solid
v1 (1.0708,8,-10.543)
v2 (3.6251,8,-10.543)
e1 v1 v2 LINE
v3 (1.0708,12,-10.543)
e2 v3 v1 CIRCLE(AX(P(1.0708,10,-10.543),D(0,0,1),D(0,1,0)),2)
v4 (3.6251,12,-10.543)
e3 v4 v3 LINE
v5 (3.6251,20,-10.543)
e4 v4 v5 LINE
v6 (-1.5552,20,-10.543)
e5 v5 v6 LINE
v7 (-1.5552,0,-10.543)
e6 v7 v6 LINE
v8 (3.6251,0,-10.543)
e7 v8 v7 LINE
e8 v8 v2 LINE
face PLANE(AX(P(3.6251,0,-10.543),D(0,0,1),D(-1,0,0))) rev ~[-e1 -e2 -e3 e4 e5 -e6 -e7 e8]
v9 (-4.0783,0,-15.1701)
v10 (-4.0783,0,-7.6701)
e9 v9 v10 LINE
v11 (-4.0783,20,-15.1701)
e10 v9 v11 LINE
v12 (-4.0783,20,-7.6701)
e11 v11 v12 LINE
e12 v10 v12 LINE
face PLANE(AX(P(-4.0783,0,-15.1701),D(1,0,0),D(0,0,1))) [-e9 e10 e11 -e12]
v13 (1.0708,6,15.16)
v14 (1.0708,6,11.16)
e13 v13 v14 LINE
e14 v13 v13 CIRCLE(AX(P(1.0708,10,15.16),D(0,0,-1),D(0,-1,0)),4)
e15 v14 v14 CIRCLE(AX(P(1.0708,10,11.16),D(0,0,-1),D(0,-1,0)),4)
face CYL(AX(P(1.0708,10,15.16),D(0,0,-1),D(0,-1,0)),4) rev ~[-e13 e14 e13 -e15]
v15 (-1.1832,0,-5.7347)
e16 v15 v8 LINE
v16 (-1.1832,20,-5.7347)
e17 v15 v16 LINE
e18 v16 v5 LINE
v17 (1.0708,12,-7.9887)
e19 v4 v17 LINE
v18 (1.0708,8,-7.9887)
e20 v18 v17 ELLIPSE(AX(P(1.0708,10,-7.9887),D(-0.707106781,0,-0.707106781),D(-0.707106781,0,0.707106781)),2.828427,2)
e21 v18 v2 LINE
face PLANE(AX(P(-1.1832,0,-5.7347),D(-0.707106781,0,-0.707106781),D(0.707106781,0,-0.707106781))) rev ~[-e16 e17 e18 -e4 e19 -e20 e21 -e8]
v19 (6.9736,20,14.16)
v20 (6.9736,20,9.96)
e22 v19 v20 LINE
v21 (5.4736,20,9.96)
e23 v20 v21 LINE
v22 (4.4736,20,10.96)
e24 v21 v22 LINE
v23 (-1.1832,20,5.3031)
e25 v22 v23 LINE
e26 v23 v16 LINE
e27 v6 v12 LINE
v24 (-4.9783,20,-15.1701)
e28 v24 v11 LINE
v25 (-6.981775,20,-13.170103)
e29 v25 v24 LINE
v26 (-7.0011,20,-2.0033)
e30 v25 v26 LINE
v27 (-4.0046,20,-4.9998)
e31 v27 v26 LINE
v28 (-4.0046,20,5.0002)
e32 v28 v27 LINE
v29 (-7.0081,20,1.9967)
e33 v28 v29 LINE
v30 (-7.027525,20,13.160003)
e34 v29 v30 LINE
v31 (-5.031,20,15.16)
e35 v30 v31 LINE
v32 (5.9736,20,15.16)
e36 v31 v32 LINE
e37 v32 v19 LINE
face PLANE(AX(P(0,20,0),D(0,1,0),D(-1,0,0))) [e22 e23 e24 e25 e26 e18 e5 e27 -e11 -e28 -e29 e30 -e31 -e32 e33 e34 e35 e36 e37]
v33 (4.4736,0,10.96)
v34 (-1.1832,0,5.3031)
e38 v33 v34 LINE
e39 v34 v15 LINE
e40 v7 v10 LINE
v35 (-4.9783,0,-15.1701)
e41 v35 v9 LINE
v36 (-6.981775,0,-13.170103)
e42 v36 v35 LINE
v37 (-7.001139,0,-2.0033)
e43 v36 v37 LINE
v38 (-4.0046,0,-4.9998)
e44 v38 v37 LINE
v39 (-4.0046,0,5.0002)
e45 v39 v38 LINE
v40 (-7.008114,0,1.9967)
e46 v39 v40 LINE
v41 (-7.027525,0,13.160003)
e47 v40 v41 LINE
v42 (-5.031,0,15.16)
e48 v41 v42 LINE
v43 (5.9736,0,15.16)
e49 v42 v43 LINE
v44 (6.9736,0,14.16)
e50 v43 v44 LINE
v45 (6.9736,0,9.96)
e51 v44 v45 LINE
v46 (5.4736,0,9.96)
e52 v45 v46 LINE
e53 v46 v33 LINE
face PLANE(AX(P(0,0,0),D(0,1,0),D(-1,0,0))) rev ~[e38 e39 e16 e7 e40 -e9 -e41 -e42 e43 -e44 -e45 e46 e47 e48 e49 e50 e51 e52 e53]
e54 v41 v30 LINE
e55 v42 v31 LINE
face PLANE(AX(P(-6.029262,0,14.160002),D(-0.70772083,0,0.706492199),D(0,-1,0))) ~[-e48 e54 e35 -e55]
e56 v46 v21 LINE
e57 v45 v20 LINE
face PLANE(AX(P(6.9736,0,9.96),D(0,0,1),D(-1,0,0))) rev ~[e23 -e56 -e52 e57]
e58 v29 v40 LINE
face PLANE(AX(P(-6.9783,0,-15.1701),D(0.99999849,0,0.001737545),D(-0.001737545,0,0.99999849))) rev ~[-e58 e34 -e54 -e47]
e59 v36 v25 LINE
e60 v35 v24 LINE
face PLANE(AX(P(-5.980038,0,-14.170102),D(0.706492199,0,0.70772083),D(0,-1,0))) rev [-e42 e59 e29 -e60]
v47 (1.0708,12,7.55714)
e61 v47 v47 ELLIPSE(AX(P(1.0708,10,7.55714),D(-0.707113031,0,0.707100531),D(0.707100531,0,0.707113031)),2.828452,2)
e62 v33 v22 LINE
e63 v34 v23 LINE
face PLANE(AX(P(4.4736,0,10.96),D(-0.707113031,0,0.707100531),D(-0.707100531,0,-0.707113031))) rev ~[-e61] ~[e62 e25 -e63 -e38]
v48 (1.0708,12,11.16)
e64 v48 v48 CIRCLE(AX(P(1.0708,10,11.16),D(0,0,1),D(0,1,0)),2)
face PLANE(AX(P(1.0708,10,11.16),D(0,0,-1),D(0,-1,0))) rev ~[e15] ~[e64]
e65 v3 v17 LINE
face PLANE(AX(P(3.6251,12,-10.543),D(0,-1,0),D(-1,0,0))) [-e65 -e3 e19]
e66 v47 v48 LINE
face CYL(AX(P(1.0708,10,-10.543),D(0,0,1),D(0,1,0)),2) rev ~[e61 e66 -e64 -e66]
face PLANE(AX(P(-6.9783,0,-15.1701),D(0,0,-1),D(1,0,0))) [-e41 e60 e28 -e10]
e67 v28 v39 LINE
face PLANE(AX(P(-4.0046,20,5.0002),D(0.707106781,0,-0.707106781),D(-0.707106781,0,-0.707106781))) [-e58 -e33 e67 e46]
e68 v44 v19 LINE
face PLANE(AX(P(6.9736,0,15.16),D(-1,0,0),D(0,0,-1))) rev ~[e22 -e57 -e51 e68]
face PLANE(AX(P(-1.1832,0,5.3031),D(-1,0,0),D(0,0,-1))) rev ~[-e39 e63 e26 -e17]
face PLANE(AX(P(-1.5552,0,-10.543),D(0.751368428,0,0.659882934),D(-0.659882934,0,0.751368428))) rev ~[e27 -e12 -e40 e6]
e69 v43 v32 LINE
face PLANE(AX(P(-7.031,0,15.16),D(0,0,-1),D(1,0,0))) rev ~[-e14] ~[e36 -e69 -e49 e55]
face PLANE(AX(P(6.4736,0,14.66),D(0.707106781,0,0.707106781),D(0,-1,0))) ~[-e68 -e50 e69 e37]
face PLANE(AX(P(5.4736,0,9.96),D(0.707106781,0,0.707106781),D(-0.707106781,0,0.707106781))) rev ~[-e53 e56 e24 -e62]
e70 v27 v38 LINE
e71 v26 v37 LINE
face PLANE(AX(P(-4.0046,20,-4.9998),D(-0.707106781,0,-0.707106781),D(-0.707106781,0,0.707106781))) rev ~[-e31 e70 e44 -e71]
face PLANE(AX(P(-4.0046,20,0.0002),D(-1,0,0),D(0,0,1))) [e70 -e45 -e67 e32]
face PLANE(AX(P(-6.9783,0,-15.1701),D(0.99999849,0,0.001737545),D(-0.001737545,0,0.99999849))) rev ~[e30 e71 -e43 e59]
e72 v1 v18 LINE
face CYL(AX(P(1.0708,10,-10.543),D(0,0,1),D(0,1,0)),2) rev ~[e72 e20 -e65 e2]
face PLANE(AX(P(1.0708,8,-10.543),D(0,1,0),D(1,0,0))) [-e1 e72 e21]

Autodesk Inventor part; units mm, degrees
ref_plane "YZ Plane" through (0, 0, 0) normal (1, 0, 0) x (0, 1, 0)
ref_plane "XZ Plane" through (0, 0, 0) normal (0, 1, 0) x (-1, 0, 0)
ref_plane "XY Plane" through (0, 0, 0) normal (0, 0, 1) x (1, 0, 0)
sketch "Sketch1" plane through (0, 0, 0) normal (0, 1, 0) x (-1, 0, 0)
  line L0 (7.031, 15.16) -> (-6.9736, 15.16)
  line L1 (6.9783, -15.1701) -> (7.031, 15.16)
  line L2 (7.031, 15.16) -> (-7.0217, -15.14) construction
  line L3 (-6.9736, 15.16) -> (6.9783, -15.1701) construction
  line L4 (-5.5, 10.15) -> (-3.5, 10.15) construction
  line L5 (6.9783, -15.1701) -> (4.0783, -15.1701)
  line L6 (4.0783, -15.1701) -> (4.0783, -7.6701)
  line L7 (-5.5, 10.15) -> (-4, 10.15) construction
  line L8 (1.5552, -10.543) -> (4.0783, -7.6701)
  line L9 (-6.9736, 15.16) -> (-6.9736, 9.96)
  line L10 (-6.9736, 9.96) -> (-5.4736, 9.96)
  line L11 (-5.4736, 9.96) -> (-4.4736, 10.96)
  line L12 (-5.4736, 9.96) -> (-4.0594, 9.96) construction
  line L13 (-4.4736, 10.96) -> (1.1832, 5.3031)
  line L14 (1.1832, 5.3031) -> (1.1832, -5.7347)
  line L15 (1.1832, -5.7347) -> (9.1832, -5.7347) construction
  line L16 (1.1832, -5.7347) -> (-3.6251, -10.543)
  line L17 (-3.6251, -10.543) -> (1.5552, -10.543)
  point P0 (0, 0)
  point P1 (-6.5, 10.15)
  dimension "d0" = 14
  dimension "d1" = 30.3
  dimension "d11" = 2.9
  dimension "d12" = 7.5
  dimension "d25" = 41.29
  dimension "d28" = 5.2
  dimension "d29" = 1.5
  dimension "d32" = 4.2
  dimension "d33" = 8
  dimension "d38" = 6.8
  dimension "d40" = 135
  dimension "d41" = 90
  dimension "d42" = 135
extrude "Extrusion1" add sketch "Sketch1" along normal blind 20
chamfer "Chamfer1" distance 2 angle 45 2 edges at (-7.031, 10, 15.16) (-6.9783, 10, -15.1701)
chamfer "Chamfer2" distance 1 angle 45 1 edges at (6.9736, 10, 15.16)
sketch "Sketch3" plane through (3.6251, 0, -10.543) normal (0, 0, -1) x (-1, 0, 0)
  line L0 (0, 0) -> (5.1803, 0) construction
  line L1 (5.1803, 0) -> (5.1803, 20) construction
  line L2 (0, 20) -> (5.1803, 20) construction
  line L3 (0, 0) -> (0, 20) construction
  line L4 (8.6561, 20) -> (-2.3485, 20) construction
  line L5 (5.1803, 0) -> (5.1803, 20) construction
  line L6 (5.1803, 10) -> (2.5543, 10) construction
  point P0 (3.6251, 0)
  dimension "d45" = 2.626
hole "Hole1" at (1.0708, 10, -10.543) direction (0, 0, 1) diameter 4 end through all
sketch "Sketch4" plane through (3.6251, 0, -10.543) normal (0, 0, -1) x (-1, 0, 0)
  circle A0 centre (2.5543, 10) radius 2 construction
  line L0 (2.5543, 8) -> (2.5543, 12)
  circle A1 centre (2.5543, 10) radius 2 construction
  line L1 (2.5543, 8) -> (0, 8)
  line L2 (0, 0) -> (0, 20) projected
  line L3 (0, 8) -> (0, 12)
  line L4 (0, 12) -> (2.5543, 12)
  point P0 (3.6251, 0)
extrude "Extrusion2" cut sketch "Sketch4" against normal blind 5
sketch "Sketch5" plane through (-5.031, 0, 15.16) normal (0, 0, 1) x (1, 0, 0)
  circle A0 centre (6.1018, 10) radius 2 projected
  point P0 (5.031, 0)
hole "Hole2" at (1.0708, 10, 15.16) direction (0, 0, -1) diameter 8 depth 4
sketch "Sketch6" plane through (0, 20, 0) normal (0, 1, 0) x (1, 0, 0)
  line L0 (6.9736, -14.16) -> (5.9736, -15.16) construction
  line L1 (6.9736, -14.16) -> (6.9736, -9.96) construction
  line L2 (6.9736, -9.96) -> (5.4736, -9.96) construction
  line L3 (5.4736, -9.96) -> (4.4736, -10.96) construction
  line L4 (4.4736, -10.96) -> (-1.1832, -5.3031) construction
  line L5 (-1.1832, -5.3031) -> (-1.1832, 5.7347) construction
  line L6 (-1.1832, 5.7347) -> (3.6251, 10.543) construction
  line L7 (3.6251, 10.543) -> (-1.5552, 10.543) construction
  line L8 (-1.5552, 10.543) -> (-4.0783, 7.6701) construction
  line L9 (-4.0783, 7.6701) -> (-4.0783, 15.1701) construction
  line L10 (-4.0783, 15.1701) -> (-4.9783, 15.1701) construction
  line L11 (-6.9817, 13.1701) -> (-4.9783, 15.1701) construction
  line L12 (-6.9817, 13.1701) -> (-7.0275, -13.16) construction
  line L13 (-5.031, -15.16) -> (-7.0275, -13.16) construction
  line L14 (-5.031, -15.16) -> (5.9736, -15.16) construction
  line L15 (-6.9817, 13.1701) -> (-7.0275, -13.16) construction
  line L16 (-7.0275, -13.16) -> (-7.0046, 0.005) construction
  line L17 (-7.0046, 0.005) -> (-4.0046, -0.0002) construction
  line L18 (-4.0046, -0.0002) -> (-4.0046, 4.9998)
  line L19 (-4.0046, -0.0002) -> (0.9954, -0.0002) construction
  line L20 (-4.0046, -0.0002) -> (-4.0046, -5.0002)
  line L21 (-4.0046, -5.0002) -> (-7.0081, -1.9967)
  line L22 (-4.0046, 4.9998) -> (-7.0011, 2.0033)
  line L23 (-7.0081, -1.9967) -> (-7.0011, 2.0033)
  point P0 (0, 0)
  dimension "d63" = 13.165
  dimension "d64" = 3
  dimension "d65" = 5
  dimension "d66" = 90
  dimension "d67" = 5
  dimension "d68" = 45
  dimension "d69" = 45
extrude "Extrusion3" cut sketch "Sketch6" against normal through all
equation "\"d42\" = d40"
equation "\"d69\" = d68"
properties part number "bolt_part"
